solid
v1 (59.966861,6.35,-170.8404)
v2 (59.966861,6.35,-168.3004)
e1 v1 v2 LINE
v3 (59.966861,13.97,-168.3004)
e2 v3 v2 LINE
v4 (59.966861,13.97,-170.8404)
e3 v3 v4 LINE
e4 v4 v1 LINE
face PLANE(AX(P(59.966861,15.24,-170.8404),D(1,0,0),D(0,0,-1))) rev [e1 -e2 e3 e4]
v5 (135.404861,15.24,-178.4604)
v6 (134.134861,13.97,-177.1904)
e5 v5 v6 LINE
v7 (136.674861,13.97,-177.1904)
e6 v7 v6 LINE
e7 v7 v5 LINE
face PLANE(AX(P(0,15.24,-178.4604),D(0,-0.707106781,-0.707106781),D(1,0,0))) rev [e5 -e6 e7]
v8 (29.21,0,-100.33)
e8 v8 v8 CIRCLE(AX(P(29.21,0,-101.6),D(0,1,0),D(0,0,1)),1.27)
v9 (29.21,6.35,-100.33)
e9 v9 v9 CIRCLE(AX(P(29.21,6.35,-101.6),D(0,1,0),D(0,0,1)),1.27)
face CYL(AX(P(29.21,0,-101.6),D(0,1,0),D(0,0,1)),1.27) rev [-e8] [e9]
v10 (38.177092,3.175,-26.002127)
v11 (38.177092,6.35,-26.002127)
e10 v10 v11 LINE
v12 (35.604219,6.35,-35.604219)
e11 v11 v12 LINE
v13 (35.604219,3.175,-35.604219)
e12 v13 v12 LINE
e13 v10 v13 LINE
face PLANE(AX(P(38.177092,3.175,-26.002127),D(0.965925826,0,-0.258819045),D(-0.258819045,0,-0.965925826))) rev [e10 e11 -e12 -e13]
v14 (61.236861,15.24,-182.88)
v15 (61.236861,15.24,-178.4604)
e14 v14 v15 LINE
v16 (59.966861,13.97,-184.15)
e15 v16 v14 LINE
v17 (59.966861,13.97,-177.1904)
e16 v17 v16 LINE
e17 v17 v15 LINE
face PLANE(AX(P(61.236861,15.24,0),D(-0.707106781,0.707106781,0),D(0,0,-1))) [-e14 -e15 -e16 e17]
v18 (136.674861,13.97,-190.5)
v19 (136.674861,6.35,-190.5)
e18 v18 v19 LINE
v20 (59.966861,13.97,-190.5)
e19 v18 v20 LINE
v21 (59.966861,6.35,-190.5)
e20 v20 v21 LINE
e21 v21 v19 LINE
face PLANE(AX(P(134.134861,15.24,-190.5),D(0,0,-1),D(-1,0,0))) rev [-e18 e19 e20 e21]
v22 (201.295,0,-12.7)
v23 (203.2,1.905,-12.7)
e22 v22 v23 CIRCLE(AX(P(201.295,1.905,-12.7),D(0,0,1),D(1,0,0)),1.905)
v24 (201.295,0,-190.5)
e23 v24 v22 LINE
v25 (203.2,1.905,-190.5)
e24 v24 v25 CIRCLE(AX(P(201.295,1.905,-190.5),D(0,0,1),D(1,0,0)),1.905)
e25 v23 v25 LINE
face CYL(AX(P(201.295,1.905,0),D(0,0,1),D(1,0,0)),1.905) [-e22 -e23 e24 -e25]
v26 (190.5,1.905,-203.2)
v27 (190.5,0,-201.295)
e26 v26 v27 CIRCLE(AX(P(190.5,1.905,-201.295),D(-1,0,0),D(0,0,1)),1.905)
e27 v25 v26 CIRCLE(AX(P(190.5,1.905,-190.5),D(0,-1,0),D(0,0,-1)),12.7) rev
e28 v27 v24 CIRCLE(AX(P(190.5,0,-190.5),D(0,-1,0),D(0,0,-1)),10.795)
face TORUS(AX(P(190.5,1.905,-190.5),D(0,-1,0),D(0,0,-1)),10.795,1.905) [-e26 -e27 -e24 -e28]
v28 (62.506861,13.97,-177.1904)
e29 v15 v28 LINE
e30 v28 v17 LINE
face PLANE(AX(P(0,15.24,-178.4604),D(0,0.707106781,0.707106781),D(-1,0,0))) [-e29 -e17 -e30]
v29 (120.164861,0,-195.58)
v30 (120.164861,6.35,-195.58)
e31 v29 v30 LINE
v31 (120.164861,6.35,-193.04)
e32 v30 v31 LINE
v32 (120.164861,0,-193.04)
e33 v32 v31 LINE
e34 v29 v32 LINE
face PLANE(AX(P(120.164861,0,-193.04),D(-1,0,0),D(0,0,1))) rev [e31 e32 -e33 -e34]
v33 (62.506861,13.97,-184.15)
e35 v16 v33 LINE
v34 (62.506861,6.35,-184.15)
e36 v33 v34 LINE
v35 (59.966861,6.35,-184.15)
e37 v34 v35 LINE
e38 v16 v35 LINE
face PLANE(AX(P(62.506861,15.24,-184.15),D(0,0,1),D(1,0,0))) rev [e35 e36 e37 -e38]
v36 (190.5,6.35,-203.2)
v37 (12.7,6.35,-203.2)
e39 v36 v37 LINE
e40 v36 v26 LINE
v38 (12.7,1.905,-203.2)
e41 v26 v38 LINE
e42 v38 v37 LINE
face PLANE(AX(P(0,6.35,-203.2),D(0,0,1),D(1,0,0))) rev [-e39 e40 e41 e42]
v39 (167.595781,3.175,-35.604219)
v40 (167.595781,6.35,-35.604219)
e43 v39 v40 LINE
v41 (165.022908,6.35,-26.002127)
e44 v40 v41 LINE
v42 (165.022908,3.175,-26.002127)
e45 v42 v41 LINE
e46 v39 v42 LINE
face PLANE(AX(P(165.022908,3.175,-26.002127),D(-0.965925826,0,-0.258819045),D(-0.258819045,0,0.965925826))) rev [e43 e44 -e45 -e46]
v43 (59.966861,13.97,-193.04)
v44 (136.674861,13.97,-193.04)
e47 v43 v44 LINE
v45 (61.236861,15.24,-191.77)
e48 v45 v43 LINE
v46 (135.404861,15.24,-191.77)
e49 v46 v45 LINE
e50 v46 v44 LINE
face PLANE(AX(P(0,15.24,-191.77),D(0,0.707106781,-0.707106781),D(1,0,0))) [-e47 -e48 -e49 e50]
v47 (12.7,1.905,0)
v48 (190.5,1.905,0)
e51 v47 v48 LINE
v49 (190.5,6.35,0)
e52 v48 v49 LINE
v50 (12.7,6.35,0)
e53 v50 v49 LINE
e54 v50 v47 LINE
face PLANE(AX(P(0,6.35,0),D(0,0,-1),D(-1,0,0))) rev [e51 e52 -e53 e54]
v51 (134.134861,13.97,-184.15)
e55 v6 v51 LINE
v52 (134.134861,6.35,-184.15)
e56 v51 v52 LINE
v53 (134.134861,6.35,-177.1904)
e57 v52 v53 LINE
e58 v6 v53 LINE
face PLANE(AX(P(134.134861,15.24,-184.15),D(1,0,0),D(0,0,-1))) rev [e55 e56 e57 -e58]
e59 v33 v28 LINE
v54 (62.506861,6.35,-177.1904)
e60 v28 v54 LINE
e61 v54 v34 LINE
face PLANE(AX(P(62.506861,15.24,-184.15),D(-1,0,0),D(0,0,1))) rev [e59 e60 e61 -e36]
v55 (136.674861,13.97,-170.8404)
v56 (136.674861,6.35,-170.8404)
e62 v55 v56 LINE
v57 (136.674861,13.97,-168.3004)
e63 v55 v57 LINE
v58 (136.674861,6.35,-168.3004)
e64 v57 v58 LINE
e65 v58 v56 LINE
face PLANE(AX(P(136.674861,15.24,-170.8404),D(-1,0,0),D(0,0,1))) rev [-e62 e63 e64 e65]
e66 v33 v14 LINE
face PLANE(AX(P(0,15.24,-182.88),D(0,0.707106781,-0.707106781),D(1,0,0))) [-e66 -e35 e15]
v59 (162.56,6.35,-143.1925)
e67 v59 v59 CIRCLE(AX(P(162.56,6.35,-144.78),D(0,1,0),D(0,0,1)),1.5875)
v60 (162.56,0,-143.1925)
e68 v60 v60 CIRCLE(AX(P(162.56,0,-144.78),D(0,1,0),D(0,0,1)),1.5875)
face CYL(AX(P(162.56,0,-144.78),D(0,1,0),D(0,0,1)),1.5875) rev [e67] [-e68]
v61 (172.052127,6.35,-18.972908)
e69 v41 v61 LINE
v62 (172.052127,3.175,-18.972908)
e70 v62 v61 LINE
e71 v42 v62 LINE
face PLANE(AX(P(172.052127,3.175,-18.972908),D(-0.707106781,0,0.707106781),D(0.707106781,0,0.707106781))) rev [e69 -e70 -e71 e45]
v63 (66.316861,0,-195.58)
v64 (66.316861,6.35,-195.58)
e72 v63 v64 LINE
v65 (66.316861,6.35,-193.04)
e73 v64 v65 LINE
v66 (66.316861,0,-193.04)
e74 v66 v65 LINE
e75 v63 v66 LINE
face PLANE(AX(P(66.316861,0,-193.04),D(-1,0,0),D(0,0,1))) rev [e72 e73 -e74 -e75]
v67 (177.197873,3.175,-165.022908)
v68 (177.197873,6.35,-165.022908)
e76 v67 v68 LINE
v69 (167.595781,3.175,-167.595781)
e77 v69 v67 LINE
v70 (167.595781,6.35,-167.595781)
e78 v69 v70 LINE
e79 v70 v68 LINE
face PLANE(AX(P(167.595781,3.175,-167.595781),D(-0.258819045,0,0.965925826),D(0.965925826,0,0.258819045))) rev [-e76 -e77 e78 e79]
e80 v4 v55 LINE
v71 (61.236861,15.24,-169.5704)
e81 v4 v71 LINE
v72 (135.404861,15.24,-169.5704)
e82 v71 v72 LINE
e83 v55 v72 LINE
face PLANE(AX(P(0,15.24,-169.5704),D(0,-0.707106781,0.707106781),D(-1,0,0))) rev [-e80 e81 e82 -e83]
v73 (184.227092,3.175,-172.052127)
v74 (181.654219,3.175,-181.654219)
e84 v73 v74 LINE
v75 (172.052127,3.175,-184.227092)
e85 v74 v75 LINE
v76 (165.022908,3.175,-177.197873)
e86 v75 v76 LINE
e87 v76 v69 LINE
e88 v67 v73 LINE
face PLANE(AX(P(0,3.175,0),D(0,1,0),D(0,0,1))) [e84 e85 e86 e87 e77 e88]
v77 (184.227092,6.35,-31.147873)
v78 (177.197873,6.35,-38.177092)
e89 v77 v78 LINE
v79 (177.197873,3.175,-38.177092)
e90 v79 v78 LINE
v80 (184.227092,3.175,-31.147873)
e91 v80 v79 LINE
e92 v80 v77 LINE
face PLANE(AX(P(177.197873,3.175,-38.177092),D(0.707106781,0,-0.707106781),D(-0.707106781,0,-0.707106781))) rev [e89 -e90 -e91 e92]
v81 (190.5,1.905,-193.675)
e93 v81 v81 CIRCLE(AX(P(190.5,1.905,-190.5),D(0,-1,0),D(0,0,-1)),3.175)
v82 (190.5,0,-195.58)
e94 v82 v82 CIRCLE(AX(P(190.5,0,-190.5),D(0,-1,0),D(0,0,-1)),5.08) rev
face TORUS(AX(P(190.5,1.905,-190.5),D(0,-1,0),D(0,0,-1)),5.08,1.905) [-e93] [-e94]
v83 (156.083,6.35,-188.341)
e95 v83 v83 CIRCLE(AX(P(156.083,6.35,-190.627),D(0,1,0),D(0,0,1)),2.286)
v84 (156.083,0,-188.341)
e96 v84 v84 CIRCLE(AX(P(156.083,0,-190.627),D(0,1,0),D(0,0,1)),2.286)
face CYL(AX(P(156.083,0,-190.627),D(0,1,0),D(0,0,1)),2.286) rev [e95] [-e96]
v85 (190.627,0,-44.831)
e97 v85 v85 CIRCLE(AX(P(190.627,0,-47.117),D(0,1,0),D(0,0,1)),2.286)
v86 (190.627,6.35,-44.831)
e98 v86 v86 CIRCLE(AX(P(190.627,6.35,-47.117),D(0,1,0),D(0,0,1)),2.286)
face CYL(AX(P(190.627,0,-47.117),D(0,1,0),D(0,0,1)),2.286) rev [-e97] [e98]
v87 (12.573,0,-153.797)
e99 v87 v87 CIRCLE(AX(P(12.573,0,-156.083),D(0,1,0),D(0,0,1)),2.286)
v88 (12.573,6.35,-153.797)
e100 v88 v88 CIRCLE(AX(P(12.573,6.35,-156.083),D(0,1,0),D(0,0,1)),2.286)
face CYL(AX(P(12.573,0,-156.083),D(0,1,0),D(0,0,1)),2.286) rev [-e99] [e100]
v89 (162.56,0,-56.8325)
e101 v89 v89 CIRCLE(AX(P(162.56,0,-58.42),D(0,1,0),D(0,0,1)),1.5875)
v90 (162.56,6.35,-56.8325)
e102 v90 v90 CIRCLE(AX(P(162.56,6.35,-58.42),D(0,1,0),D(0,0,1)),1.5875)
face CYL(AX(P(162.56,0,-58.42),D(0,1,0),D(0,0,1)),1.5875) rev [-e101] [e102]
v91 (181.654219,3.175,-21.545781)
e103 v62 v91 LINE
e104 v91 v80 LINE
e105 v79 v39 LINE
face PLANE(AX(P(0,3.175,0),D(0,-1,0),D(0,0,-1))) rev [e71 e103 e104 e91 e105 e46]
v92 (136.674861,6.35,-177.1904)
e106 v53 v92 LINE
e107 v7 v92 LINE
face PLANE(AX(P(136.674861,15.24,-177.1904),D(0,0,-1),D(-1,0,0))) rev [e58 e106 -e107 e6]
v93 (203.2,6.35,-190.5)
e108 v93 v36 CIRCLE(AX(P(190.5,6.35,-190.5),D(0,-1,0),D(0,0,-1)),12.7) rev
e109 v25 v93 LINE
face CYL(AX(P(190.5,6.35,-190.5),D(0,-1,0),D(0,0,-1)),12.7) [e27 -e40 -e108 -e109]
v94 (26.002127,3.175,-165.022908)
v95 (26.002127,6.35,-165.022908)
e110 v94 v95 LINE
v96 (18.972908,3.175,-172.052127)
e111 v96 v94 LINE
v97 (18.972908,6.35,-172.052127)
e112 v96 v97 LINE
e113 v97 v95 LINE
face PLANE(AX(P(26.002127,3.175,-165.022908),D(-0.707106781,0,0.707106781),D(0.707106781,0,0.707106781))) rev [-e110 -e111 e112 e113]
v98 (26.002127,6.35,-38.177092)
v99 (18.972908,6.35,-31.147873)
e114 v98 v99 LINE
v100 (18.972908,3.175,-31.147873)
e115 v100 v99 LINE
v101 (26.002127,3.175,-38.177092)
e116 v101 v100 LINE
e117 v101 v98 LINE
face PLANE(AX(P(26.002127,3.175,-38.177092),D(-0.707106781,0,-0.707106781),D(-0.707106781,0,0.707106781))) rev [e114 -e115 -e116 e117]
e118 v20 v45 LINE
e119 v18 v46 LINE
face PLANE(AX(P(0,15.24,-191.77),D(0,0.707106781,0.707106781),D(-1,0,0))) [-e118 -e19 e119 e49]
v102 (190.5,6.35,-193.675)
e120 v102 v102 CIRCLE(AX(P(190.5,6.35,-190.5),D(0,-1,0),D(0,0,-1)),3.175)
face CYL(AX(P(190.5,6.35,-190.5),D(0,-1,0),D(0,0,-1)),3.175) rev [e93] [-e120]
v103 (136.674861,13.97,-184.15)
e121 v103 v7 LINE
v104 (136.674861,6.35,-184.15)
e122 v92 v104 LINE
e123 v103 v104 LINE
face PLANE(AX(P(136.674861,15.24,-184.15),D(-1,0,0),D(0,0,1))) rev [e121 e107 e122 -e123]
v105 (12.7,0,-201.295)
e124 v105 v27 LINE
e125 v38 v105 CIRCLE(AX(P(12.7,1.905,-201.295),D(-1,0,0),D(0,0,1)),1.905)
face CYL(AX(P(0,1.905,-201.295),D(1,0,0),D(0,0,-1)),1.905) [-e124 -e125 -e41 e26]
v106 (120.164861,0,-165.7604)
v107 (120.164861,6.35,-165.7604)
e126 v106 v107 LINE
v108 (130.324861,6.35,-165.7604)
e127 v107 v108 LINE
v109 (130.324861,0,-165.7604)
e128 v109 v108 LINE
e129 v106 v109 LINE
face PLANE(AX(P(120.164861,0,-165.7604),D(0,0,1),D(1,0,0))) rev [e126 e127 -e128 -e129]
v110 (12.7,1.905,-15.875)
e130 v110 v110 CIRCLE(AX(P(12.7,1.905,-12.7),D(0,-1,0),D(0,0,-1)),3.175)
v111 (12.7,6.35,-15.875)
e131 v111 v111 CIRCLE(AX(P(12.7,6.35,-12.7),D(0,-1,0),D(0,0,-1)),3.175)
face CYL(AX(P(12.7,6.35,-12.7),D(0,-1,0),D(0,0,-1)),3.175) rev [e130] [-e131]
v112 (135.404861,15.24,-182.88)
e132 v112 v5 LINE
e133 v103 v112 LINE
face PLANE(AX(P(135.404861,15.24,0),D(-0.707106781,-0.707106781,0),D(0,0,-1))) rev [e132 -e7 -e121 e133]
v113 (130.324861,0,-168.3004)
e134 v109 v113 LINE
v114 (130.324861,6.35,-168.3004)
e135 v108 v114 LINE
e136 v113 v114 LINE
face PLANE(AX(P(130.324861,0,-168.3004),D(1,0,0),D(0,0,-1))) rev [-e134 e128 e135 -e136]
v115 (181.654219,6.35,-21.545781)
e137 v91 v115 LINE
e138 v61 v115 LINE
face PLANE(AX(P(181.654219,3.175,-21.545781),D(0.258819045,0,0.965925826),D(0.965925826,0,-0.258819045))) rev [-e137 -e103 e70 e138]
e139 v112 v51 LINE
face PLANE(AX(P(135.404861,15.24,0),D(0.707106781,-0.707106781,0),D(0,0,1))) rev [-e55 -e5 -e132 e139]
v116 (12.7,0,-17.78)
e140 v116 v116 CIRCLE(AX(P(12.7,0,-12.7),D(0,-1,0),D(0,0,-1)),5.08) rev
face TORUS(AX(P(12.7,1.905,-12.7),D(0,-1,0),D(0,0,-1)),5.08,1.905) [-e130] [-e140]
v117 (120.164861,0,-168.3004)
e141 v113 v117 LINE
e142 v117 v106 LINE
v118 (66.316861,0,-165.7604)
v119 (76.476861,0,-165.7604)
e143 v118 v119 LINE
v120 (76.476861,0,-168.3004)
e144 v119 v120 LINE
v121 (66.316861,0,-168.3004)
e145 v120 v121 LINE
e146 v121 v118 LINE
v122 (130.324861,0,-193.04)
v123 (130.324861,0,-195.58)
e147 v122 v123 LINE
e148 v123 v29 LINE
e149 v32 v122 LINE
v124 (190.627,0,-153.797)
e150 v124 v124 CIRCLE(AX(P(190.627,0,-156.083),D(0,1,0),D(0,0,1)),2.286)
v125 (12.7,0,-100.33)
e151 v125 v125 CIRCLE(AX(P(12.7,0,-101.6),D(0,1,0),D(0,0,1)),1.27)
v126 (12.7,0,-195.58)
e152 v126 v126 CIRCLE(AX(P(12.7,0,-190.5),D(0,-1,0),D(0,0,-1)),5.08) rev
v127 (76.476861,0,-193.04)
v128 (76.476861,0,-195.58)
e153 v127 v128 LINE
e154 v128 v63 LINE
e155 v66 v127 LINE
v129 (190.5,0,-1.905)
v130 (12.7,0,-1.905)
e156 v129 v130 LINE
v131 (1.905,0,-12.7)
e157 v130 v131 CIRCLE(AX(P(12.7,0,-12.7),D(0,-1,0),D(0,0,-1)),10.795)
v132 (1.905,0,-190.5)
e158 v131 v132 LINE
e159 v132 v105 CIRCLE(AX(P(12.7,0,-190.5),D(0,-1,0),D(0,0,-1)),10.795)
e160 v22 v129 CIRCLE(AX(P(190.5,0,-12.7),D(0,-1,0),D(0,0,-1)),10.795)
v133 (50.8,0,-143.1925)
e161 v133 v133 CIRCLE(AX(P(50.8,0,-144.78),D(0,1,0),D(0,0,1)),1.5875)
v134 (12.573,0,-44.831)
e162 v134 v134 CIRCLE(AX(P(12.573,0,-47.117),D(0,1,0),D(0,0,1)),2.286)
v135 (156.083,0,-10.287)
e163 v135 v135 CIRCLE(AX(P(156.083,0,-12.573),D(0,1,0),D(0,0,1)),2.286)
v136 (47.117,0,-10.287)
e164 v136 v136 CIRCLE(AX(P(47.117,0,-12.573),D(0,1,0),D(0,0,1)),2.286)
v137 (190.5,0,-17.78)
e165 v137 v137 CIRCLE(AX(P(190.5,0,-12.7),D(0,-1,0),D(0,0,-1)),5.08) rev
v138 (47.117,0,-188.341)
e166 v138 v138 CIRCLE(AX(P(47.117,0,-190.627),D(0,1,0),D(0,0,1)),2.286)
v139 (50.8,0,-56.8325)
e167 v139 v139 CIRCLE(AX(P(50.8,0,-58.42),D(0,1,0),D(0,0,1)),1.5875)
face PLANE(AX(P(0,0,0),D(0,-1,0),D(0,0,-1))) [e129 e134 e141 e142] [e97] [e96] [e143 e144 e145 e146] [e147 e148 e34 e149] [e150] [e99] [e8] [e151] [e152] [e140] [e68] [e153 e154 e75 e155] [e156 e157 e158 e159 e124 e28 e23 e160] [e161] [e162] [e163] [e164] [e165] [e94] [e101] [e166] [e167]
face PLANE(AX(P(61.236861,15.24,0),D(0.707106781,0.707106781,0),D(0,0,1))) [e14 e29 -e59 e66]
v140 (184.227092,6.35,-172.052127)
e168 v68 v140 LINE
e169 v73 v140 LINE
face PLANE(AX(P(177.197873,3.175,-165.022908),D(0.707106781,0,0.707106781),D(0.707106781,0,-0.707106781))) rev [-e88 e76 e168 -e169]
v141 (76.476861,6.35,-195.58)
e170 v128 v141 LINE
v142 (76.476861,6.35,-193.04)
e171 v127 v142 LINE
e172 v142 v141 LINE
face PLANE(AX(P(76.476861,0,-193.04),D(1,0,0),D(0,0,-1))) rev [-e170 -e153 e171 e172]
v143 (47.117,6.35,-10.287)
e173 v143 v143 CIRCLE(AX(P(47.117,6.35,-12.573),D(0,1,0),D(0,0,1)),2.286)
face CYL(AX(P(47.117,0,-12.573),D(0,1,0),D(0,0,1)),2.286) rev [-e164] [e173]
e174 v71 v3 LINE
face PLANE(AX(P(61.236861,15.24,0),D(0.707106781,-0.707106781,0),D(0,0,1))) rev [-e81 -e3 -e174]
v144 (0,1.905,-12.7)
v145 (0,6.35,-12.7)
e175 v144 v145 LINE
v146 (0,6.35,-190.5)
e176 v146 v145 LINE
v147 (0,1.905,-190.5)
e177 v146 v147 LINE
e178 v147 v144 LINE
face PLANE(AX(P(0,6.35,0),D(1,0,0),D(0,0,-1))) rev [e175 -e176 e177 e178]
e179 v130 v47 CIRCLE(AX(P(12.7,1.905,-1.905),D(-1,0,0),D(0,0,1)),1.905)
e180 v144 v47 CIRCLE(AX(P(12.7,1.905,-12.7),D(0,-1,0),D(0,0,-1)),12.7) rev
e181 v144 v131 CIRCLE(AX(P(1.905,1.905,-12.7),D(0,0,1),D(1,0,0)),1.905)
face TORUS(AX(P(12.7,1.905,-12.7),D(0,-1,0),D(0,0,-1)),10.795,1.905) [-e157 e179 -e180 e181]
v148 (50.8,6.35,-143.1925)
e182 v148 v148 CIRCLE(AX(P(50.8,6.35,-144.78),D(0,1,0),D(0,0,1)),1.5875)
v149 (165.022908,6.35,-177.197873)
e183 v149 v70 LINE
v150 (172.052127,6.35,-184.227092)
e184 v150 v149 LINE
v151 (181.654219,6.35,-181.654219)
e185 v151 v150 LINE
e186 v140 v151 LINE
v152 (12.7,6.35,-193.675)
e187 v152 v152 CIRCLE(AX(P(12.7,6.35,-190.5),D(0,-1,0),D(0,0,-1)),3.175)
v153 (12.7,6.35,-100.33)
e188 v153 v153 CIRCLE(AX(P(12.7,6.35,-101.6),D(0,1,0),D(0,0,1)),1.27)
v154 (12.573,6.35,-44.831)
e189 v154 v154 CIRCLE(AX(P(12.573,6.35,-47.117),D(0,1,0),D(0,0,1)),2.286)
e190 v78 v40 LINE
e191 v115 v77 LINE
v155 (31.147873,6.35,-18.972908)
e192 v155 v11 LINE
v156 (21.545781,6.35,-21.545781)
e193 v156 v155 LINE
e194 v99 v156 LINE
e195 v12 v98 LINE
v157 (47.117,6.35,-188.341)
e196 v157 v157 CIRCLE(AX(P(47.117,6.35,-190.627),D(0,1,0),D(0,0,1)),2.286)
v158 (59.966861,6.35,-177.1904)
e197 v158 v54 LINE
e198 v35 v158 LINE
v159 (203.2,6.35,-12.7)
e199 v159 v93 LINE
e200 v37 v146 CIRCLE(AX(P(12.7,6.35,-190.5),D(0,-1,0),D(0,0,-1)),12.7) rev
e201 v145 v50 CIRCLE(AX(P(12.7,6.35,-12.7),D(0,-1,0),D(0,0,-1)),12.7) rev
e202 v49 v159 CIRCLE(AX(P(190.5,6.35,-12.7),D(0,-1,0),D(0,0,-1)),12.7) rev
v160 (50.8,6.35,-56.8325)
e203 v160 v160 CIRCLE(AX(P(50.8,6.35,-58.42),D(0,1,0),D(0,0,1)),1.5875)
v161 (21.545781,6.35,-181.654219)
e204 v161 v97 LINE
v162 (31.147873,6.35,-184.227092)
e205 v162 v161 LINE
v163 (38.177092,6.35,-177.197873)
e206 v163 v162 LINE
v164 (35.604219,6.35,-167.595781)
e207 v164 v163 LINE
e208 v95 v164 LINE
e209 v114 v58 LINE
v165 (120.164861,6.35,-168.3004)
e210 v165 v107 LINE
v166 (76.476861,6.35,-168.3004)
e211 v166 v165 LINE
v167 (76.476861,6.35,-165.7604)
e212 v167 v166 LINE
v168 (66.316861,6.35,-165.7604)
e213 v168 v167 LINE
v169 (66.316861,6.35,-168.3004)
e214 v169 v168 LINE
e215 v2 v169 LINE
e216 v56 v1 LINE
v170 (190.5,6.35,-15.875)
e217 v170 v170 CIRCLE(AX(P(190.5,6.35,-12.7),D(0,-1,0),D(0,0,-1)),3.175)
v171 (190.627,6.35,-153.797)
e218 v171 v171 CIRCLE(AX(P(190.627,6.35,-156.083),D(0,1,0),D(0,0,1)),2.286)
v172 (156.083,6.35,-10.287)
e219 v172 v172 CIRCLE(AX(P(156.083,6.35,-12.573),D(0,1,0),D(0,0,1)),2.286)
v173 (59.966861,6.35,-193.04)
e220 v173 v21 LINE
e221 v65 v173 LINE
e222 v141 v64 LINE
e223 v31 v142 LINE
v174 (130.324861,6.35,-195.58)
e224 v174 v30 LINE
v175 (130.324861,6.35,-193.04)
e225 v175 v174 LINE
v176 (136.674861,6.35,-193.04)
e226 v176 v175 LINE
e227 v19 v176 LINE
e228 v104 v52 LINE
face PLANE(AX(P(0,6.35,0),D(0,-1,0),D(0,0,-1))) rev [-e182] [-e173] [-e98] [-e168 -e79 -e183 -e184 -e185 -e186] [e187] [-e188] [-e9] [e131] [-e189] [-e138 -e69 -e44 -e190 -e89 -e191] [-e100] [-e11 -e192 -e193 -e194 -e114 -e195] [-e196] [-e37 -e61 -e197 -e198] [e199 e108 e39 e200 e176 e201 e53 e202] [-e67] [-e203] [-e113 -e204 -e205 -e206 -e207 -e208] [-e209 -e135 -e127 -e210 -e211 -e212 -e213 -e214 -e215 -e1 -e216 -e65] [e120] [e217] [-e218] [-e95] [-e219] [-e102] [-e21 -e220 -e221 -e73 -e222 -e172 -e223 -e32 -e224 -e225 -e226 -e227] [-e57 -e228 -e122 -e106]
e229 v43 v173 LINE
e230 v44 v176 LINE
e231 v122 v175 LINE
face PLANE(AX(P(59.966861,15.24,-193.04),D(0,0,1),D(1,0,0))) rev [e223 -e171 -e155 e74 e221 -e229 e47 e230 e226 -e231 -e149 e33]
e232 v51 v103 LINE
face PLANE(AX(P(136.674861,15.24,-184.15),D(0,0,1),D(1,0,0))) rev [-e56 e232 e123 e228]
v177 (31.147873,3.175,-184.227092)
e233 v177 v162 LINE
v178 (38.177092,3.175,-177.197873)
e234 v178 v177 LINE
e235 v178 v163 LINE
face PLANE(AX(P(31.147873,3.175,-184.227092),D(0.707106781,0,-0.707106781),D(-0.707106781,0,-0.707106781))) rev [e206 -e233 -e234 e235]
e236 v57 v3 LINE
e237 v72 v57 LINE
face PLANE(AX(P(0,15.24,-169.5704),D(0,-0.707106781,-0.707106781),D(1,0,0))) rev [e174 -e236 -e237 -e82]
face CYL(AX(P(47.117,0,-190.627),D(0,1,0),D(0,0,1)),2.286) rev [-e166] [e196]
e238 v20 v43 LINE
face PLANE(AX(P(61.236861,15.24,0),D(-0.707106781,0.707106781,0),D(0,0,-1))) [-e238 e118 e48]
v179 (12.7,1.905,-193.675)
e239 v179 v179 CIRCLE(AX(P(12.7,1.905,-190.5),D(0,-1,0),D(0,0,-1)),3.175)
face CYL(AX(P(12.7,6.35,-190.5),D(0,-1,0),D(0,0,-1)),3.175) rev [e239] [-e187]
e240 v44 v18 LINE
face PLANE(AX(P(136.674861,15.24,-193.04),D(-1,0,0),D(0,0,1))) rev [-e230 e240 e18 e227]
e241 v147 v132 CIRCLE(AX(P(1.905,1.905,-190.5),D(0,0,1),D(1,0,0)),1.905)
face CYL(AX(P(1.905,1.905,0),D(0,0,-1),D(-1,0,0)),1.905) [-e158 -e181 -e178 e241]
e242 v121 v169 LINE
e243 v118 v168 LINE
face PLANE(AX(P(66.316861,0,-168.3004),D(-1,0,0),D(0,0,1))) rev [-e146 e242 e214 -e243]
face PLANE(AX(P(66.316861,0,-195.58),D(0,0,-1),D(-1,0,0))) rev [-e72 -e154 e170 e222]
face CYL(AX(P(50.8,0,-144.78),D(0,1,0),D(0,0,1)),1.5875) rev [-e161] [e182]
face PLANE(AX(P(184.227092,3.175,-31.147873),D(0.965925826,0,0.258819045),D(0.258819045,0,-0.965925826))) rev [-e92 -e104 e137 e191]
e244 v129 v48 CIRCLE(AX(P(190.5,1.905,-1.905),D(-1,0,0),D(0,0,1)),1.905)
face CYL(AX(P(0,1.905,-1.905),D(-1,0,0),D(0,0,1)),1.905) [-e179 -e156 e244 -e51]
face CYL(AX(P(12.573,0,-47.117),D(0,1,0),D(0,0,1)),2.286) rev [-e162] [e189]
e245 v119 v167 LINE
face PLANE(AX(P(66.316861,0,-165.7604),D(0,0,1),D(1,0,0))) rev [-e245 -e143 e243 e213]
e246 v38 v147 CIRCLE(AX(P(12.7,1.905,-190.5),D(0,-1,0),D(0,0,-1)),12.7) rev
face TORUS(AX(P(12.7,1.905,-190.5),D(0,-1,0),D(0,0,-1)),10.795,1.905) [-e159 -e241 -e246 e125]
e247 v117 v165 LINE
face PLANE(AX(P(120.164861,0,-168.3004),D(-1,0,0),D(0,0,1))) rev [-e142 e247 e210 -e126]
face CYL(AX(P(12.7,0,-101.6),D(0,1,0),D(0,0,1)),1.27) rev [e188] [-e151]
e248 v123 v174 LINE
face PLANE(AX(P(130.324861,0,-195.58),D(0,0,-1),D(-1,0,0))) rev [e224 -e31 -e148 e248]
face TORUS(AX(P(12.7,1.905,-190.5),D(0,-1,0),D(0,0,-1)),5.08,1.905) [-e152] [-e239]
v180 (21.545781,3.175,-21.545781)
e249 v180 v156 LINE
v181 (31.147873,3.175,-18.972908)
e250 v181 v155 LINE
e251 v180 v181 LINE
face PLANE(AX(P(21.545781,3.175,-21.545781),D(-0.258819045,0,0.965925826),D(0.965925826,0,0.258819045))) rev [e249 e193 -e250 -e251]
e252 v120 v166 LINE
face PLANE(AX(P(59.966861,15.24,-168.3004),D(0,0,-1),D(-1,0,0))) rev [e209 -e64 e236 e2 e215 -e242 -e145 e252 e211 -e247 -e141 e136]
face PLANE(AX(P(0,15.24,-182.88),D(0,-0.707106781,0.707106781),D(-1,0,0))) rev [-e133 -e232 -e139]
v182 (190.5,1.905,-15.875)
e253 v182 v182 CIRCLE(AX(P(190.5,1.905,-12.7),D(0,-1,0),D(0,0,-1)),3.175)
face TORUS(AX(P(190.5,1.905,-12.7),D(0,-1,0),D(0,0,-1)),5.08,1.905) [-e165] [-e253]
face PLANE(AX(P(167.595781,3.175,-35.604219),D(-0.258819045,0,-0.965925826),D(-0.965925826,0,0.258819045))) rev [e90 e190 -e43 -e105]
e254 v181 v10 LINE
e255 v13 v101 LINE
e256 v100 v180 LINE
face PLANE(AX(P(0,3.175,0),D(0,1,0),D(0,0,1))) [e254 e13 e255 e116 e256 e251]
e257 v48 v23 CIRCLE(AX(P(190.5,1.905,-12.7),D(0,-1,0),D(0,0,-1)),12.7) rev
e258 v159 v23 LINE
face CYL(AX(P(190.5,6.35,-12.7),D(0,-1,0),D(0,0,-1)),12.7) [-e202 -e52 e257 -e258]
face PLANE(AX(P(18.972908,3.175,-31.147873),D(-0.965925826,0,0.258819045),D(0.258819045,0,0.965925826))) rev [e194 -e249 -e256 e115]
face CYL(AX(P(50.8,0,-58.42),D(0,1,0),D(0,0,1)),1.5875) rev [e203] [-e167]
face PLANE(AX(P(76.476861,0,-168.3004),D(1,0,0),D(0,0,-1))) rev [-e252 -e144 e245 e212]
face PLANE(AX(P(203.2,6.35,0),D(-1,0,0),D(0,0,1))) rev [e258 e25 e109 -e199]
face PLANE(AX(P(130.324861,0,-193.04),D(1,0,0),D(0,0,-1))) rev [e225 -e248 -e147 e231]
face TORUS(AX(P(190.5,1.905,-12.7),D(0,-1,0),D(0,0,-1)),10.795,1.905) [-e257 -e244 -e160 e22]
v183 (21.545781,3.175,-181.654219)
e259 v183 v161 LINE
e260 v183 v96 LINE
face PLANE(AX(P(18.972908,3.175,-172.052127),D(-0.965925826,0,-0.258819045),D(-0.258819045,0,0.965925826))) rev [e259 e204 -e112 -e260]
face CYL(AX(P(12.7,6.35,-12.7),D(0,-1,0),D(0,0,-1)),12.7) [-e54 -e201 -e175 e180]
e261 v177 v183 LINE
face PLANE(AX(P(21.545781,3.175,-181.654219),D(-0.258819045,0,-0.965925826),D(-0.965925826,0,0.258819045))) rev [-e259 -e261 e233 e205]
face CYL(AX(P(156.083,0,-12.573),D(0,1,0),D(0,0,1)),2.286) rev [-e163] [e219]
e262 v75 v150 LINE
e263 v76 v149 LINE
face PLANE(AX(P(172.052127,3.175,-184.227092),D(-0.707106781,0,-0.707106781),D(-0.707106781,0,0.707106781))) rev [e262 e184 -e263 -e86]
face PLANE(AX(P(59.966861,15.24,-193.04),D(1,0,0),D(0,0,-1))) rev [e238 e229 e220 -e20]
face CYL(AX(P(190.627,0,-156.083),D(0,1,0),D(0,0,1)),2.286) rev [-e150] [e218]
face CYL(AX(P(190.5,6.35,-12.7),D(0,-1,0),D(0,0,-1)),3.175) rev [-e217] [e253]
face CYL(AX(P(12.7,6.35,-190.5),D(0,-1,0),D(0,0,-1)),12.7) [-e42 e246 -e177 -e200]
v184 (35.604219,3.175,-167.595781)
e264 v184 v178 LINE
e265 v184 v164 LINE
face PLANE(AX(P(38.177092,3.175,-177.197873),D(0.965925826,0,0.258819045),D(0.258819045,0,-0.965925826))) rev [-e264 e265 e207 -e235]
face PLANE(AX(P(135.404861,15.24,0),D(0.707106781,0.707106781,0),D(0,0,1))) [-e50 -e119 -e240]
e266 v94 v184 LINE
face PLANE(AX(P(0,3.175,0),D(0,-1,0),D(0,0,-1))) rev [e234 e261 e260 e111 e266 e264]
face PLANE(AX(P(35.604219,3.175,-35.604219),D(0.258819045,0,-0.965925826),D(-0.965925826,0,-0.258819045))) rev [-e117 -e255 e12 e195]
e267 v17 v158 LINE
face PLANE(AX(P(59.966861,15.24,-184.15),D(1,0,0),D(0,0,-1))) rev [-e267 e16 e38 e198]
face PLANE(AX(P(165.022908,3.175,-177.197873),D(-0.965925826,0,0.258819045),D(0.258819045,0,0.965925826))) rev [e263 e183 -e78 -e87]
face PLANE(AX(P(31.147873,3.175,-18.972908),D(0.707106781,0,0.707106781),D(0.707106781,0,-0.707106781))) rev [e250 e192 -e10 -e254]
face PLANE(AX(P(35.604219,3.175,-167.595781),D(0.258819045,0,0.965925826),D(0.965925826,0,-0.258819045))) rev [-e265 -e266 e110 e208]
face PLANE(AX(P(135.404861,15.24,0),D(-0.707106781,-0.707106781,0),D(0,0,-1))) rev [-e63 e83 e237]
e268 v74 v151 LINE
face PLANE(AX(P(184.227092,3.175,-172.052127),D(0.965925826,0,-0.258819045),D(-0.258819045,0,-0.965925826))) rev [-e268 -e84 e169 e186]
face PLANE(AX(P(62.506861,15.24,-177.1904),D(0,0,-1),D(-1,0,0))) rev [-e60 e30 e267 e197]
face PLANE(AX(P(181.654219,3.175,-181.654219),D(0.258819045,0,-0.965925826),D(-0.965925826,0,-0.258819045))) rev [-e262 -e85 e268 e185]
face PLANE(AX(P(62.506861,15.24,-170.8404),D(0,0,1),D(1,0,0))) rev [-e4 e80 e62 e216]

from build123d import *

# Parameters (mm, degrees)
SKETCH1_W           = 203.2
SKETCH1_H           = 203.2
BOSS_EXTRUDE1_DEPTH = 6.35
FILLET1_R           = 12.7
SKETCH2_R           = 3.175
CUT_EXTRUDE1_DEPTH  = 288.438345563
CUT_EXTRUDE2_DEPTH  = 3.175
FILLET2_R           = 1.905
SKETCH28_R          = 2.286
CUT_EXTRUDE3_DEPTH  = 288.438345634
SKETCH30_R          = 1.5875
CUT_EXTRUDE4_DEPTH  = 288.438345634
SKETCH31_R          = 1.27
CUT_EXTRUDE5_DEPTH  = 288.438345634
SKETCH32_W          = 2.54
SKETCH32_H          = 6.9596
BOSS_EXTRUDE3_DEPTH = 8.89
CHAMFER2_SIZE       = 1.27
SKETCH33_W          = 10.16
SKETCH33_H          = 2.54
CUT_EXTRUDE6_DEPTH  = 288.505673232


with BuildPart() as part:
    # Sketch1 → Boss-Extrude1 (new body)
    with BuildSketch(Plane(origin=(0, 0, 0), x_dir=(1, 0, 0), z_dir=(0, 1, 0))):
        with Locations((101.6, 101.6)):
            Rectangle(SKETCH1_W, SKETCH1_H)
    extrude(amount=BOSS_EXTRUDE1_DEPTH)

    # Fillet1
    fillet1_edges = [part.edges().sort_by_distance(p)[0] for p in [
        (0, 3.175, -203.2),
        (203.2, 3.175, -203.2),
        (203.2, 3.175, 0),
        (0, 3.175, 0),
    ]]
    fillet(fillet1_edges, radius=FILLET1_R)

    # Sketch2 → Cut-Extrude1 (cut, through all)
    with BuildSketch(Plane.XZ):
        with Locations(Location((12.7, -12.7, 0), (0, 0, 270))):
            Circle(SKETCH2_R)
        with Locations(Location((190.5, -12.7, 0), (0, 0, 270))):
            Circle(SKETCH2_R)
        with Locations(Location((190.5, -190.5, 0), (0, 0, 270))):
            Circle(SKETCH2_R)
        with Locations(Location((12.7, -190.5, 0), (0, 0, 270))):
            Circle(SKETCH2_R)
    extrude(amount=-CUT_EXTRUDE1_DEPTH, mode=Mode.SUBTRACT)

    # Sketch22 → Cut-Extrude2 (cut)
    with BuildSketch(Plane(origin=(0, 6.35, 0), x_dir=(1, 0, 0), z_dir=(0, 1, 0))):
        Polygon((181.654219065, 181.654219065), (172.052127253, 184.227091812), (165.022908188, 177.197872747), (167.595780935, 167.595780935), (177.197872747, 165.022908188), (184.227091812, 172.052127253), align=None)
        Polygon((18.972908188, 172.052127253), (21.545780935, 181.654219065), (31.147872747, 184.227091812), (38.177091812, 177.197872747), (35.604219065, 167.595780935), (26.002127253, 165.022908188), align=None)
        Polygon((184.227091812, 31.147872747), (181.654219065, 21.545780935), (172.052127253, 18.972908188), (165.022908188, 26.002127253), (167.595780935, 35.604219065), (177.197872747, 38.177091812), align=None)
        Polygon((21.545780935, 21.545780935), (31.147872747, 18.972908188), (38.177091812, 26.002127253), (35.604219065, 35.604219065), (26.002127253, 38.177091812), (18.972908188, 31.147872747), align=None)
    extrude(amount=-CUT_EXTRUDE2_DEPTH, mode=Mode.SUBTRACT)

    # Fillet2
    fillet2_edges = [part.edges().sort_by_distance(p)[0] for p in [
        (0, 0, -101.6),
        (101.6, 0, -203.2),
        (203.2, 0, -101.6),
        (101.6, 0, 0),
        (199.480256121, 0, -199.480256121),
        (199.480256121, 0, -3.719743879),
        (3.719743879, 0, -3.719743879),
        (3.719743879, 0, -199.480256121),
        (12.7, 0, -187.325),
        (190.5, 0, -187.325),
        (190.5, 0, -9.525),
        (12.7, 0, -9.525),
    ]]
    fillet(fillet2_edges, radius=FILLET2_R)

    # Sketch28 → Cut-Extrude3 (cut, through all)
    with BuildSketch(Plane(origin=(0, 6.35, 0), x_dir=(1, 0, 0), z_dir=(0, 1, 0))):
        with Locations(Location((47.117, 190.627, 0), (0, 0, 270))):
            Circle(SKETCH28_R)
        with Locations(Location((156.083, 190.627, 0), (0, 0, 270))):
            Circle(SKETCH28_R)
        with Locations(Location((190.627, 156.083, 0), (0, 0, 270))):
            Circle(SKETCH28_R)
        with Locations(Location((190.627, 47.117, 0), (0, 0, 270))):
            Circle(SKETCH28_R)
        with Locations(Location((156.083, 12.573, 0), (0, 0, 270))):
            Circle(SKETCH28_R)
        with Locations(Location((47.117, 12.573, 0), (0, 0, 270))):
            Circle(SKETCH28_R)
        with Locations(Location((12.573, 156.083, 0), (0, 0, 270))):
            Circle(SKETCH28_R)
        with Locations(Location((12.573, 47.117, 0), (0, 0, 270))):
            Circle(SKETCH28_R)
    extrude(amount=-CUT_EXTRUDE3_DEPTH, mode=Mode.SUBTRACT)

    # Sketch30 → Cut-Extrude4 (cut, through all)
    with BuildSketch(Plane(origin=(0, 6.35, 0), x_dir=(1, 0, 0), z_dir=(0, 1, 0))):
        with Locations(Location((50.8, 144.78, 0), (0, 0, 270))):
            Circle(SKETCH30_R)
        with Locations(Location((162.56, 144.78, 0), (0, 0, 270))):
            Circle(SKETCH30_R)
        with Locations(Location((162.56, 58.42, 0), (0, 0, 270))):
            Circle(SKETCH30_R)
        with Locations(Location((50.8, 58.42, 0), (0, 0, 270))):
            Circle(SKETCH30_R)
    extrude(amount=-CUT_EXTRUDE4_DEPTH, mode=Mode.SUBTRACT)

    # Sketch31 → Cut-Extrude5 (cut, through all)
    with BuildSketch(Plane(origin=(0, 6.35, 0), x_dir=(1, 0, 0), z_dir=(0, 1, 0))):
        with Locations(Location((12.7, 101.6, 0), (0, 0, 270))):
            Circle(SKETCH31_R)
        with Locations(Location((29.21, 101.6, 0), (0, 0, 270))):
            Circle(SKETCH31_R)
    extrude(amount=-CUT_EXTRUDE5_DEPTH, mode=Mode.SUBTRACT)

    # Sketch32 → Boss-Extrude3 (add)
    with BuildSketch(Plane(origin=(0, 6.35, 0), x_dir=(1, 0, 0), z_dir=(0, 1, 0))):
        Polygon((62.506860802, 190.5), (134.134860802, 190.5), (136.674860802, 190.5), (136.674860802, 193.04), (59.966860802, 193.04), (59.966860802, 190.5), align=None)
        with Locations((61.236860802, 180.6702)):
            Rectangle(SKETCH32_W, SKETCH32_H)
        Polygon((62.506860802, 170.8404), (134.134860802, 170.8404), (136.674860802, 170.8404), (136.674860802, 168.3004), (59.966860802, 168.3004), (59.966860802, 170.8404), align=None)
        with Locations((135.404860802, 180.6702)):
            Rectangle(SKETCH32_W, SKETCH32_H)
    extrude(amount=BOSS_EXTRUDE3_DEPTH)

    # Chamfer2
    chamfer2_edges = [part.edges().sort_by_distance(p)[0] for p in [
        (98.320860802, 15.24, -190.5),
        (136.674860802, 15.24, -191.77),
        (98.320860802, 15.24, -193.04),
        (59.966860802, 15.24, -191.77),
        (98.320860802, 15.24, -170.8404),
        (59.966860802, 15.24, -169.5704),
        (98.320860802, 15.24, -168.3004),
        (136.674860802, 15.24, -169.5704),
        (61.236860802, 15.24, -184.15),
        (59.966860802, 15.24, -180.6702),
        (61.236860802, 15.24, -177.1904),
        (62.506860802, 15.24, -180.6702),
        (136.674860802, 15.24, -180.6702),
        (135.404860802, 15.24, -184.15),
        (134.134860802, 15.24, -180.6702),
        (135.404860802, 15.24, -177.1904),
    ]]
    chamfer(chamfer2_edges, length=CHAMFER2_SIZE - 0.0001)  # a hair under: the kernel refuses the full size

    # Sketch33 → Cut-Extrude6 (cut, through all)
    with BuildSketch(Plane(origin=(0, 6.35, 0), x_dir=(1, 0, 0), z_dir=(0, 1, 0))):
        with Locations((71.396860802, 167.0304)):
            Rectangle(SKETCH33_W, SKETCH33_H)
        with Locations((125.244860802, 167.0304)):
            Rectangle(SKETCH33_W, SKETCH33_H)
        with Locations((125.244860802, 194.31)):
            Rectangle(SKETCH33_W, SKETCH33_H)
        with Locations((71.396860802, 194.31)):
            Rectangle(SKETCH33_W, SKETCH33_H)
    extrude(amount=-CUT_EXTRUDE6_DEPTH, mode=Mode.SUBTRACT)


solid = part.part
